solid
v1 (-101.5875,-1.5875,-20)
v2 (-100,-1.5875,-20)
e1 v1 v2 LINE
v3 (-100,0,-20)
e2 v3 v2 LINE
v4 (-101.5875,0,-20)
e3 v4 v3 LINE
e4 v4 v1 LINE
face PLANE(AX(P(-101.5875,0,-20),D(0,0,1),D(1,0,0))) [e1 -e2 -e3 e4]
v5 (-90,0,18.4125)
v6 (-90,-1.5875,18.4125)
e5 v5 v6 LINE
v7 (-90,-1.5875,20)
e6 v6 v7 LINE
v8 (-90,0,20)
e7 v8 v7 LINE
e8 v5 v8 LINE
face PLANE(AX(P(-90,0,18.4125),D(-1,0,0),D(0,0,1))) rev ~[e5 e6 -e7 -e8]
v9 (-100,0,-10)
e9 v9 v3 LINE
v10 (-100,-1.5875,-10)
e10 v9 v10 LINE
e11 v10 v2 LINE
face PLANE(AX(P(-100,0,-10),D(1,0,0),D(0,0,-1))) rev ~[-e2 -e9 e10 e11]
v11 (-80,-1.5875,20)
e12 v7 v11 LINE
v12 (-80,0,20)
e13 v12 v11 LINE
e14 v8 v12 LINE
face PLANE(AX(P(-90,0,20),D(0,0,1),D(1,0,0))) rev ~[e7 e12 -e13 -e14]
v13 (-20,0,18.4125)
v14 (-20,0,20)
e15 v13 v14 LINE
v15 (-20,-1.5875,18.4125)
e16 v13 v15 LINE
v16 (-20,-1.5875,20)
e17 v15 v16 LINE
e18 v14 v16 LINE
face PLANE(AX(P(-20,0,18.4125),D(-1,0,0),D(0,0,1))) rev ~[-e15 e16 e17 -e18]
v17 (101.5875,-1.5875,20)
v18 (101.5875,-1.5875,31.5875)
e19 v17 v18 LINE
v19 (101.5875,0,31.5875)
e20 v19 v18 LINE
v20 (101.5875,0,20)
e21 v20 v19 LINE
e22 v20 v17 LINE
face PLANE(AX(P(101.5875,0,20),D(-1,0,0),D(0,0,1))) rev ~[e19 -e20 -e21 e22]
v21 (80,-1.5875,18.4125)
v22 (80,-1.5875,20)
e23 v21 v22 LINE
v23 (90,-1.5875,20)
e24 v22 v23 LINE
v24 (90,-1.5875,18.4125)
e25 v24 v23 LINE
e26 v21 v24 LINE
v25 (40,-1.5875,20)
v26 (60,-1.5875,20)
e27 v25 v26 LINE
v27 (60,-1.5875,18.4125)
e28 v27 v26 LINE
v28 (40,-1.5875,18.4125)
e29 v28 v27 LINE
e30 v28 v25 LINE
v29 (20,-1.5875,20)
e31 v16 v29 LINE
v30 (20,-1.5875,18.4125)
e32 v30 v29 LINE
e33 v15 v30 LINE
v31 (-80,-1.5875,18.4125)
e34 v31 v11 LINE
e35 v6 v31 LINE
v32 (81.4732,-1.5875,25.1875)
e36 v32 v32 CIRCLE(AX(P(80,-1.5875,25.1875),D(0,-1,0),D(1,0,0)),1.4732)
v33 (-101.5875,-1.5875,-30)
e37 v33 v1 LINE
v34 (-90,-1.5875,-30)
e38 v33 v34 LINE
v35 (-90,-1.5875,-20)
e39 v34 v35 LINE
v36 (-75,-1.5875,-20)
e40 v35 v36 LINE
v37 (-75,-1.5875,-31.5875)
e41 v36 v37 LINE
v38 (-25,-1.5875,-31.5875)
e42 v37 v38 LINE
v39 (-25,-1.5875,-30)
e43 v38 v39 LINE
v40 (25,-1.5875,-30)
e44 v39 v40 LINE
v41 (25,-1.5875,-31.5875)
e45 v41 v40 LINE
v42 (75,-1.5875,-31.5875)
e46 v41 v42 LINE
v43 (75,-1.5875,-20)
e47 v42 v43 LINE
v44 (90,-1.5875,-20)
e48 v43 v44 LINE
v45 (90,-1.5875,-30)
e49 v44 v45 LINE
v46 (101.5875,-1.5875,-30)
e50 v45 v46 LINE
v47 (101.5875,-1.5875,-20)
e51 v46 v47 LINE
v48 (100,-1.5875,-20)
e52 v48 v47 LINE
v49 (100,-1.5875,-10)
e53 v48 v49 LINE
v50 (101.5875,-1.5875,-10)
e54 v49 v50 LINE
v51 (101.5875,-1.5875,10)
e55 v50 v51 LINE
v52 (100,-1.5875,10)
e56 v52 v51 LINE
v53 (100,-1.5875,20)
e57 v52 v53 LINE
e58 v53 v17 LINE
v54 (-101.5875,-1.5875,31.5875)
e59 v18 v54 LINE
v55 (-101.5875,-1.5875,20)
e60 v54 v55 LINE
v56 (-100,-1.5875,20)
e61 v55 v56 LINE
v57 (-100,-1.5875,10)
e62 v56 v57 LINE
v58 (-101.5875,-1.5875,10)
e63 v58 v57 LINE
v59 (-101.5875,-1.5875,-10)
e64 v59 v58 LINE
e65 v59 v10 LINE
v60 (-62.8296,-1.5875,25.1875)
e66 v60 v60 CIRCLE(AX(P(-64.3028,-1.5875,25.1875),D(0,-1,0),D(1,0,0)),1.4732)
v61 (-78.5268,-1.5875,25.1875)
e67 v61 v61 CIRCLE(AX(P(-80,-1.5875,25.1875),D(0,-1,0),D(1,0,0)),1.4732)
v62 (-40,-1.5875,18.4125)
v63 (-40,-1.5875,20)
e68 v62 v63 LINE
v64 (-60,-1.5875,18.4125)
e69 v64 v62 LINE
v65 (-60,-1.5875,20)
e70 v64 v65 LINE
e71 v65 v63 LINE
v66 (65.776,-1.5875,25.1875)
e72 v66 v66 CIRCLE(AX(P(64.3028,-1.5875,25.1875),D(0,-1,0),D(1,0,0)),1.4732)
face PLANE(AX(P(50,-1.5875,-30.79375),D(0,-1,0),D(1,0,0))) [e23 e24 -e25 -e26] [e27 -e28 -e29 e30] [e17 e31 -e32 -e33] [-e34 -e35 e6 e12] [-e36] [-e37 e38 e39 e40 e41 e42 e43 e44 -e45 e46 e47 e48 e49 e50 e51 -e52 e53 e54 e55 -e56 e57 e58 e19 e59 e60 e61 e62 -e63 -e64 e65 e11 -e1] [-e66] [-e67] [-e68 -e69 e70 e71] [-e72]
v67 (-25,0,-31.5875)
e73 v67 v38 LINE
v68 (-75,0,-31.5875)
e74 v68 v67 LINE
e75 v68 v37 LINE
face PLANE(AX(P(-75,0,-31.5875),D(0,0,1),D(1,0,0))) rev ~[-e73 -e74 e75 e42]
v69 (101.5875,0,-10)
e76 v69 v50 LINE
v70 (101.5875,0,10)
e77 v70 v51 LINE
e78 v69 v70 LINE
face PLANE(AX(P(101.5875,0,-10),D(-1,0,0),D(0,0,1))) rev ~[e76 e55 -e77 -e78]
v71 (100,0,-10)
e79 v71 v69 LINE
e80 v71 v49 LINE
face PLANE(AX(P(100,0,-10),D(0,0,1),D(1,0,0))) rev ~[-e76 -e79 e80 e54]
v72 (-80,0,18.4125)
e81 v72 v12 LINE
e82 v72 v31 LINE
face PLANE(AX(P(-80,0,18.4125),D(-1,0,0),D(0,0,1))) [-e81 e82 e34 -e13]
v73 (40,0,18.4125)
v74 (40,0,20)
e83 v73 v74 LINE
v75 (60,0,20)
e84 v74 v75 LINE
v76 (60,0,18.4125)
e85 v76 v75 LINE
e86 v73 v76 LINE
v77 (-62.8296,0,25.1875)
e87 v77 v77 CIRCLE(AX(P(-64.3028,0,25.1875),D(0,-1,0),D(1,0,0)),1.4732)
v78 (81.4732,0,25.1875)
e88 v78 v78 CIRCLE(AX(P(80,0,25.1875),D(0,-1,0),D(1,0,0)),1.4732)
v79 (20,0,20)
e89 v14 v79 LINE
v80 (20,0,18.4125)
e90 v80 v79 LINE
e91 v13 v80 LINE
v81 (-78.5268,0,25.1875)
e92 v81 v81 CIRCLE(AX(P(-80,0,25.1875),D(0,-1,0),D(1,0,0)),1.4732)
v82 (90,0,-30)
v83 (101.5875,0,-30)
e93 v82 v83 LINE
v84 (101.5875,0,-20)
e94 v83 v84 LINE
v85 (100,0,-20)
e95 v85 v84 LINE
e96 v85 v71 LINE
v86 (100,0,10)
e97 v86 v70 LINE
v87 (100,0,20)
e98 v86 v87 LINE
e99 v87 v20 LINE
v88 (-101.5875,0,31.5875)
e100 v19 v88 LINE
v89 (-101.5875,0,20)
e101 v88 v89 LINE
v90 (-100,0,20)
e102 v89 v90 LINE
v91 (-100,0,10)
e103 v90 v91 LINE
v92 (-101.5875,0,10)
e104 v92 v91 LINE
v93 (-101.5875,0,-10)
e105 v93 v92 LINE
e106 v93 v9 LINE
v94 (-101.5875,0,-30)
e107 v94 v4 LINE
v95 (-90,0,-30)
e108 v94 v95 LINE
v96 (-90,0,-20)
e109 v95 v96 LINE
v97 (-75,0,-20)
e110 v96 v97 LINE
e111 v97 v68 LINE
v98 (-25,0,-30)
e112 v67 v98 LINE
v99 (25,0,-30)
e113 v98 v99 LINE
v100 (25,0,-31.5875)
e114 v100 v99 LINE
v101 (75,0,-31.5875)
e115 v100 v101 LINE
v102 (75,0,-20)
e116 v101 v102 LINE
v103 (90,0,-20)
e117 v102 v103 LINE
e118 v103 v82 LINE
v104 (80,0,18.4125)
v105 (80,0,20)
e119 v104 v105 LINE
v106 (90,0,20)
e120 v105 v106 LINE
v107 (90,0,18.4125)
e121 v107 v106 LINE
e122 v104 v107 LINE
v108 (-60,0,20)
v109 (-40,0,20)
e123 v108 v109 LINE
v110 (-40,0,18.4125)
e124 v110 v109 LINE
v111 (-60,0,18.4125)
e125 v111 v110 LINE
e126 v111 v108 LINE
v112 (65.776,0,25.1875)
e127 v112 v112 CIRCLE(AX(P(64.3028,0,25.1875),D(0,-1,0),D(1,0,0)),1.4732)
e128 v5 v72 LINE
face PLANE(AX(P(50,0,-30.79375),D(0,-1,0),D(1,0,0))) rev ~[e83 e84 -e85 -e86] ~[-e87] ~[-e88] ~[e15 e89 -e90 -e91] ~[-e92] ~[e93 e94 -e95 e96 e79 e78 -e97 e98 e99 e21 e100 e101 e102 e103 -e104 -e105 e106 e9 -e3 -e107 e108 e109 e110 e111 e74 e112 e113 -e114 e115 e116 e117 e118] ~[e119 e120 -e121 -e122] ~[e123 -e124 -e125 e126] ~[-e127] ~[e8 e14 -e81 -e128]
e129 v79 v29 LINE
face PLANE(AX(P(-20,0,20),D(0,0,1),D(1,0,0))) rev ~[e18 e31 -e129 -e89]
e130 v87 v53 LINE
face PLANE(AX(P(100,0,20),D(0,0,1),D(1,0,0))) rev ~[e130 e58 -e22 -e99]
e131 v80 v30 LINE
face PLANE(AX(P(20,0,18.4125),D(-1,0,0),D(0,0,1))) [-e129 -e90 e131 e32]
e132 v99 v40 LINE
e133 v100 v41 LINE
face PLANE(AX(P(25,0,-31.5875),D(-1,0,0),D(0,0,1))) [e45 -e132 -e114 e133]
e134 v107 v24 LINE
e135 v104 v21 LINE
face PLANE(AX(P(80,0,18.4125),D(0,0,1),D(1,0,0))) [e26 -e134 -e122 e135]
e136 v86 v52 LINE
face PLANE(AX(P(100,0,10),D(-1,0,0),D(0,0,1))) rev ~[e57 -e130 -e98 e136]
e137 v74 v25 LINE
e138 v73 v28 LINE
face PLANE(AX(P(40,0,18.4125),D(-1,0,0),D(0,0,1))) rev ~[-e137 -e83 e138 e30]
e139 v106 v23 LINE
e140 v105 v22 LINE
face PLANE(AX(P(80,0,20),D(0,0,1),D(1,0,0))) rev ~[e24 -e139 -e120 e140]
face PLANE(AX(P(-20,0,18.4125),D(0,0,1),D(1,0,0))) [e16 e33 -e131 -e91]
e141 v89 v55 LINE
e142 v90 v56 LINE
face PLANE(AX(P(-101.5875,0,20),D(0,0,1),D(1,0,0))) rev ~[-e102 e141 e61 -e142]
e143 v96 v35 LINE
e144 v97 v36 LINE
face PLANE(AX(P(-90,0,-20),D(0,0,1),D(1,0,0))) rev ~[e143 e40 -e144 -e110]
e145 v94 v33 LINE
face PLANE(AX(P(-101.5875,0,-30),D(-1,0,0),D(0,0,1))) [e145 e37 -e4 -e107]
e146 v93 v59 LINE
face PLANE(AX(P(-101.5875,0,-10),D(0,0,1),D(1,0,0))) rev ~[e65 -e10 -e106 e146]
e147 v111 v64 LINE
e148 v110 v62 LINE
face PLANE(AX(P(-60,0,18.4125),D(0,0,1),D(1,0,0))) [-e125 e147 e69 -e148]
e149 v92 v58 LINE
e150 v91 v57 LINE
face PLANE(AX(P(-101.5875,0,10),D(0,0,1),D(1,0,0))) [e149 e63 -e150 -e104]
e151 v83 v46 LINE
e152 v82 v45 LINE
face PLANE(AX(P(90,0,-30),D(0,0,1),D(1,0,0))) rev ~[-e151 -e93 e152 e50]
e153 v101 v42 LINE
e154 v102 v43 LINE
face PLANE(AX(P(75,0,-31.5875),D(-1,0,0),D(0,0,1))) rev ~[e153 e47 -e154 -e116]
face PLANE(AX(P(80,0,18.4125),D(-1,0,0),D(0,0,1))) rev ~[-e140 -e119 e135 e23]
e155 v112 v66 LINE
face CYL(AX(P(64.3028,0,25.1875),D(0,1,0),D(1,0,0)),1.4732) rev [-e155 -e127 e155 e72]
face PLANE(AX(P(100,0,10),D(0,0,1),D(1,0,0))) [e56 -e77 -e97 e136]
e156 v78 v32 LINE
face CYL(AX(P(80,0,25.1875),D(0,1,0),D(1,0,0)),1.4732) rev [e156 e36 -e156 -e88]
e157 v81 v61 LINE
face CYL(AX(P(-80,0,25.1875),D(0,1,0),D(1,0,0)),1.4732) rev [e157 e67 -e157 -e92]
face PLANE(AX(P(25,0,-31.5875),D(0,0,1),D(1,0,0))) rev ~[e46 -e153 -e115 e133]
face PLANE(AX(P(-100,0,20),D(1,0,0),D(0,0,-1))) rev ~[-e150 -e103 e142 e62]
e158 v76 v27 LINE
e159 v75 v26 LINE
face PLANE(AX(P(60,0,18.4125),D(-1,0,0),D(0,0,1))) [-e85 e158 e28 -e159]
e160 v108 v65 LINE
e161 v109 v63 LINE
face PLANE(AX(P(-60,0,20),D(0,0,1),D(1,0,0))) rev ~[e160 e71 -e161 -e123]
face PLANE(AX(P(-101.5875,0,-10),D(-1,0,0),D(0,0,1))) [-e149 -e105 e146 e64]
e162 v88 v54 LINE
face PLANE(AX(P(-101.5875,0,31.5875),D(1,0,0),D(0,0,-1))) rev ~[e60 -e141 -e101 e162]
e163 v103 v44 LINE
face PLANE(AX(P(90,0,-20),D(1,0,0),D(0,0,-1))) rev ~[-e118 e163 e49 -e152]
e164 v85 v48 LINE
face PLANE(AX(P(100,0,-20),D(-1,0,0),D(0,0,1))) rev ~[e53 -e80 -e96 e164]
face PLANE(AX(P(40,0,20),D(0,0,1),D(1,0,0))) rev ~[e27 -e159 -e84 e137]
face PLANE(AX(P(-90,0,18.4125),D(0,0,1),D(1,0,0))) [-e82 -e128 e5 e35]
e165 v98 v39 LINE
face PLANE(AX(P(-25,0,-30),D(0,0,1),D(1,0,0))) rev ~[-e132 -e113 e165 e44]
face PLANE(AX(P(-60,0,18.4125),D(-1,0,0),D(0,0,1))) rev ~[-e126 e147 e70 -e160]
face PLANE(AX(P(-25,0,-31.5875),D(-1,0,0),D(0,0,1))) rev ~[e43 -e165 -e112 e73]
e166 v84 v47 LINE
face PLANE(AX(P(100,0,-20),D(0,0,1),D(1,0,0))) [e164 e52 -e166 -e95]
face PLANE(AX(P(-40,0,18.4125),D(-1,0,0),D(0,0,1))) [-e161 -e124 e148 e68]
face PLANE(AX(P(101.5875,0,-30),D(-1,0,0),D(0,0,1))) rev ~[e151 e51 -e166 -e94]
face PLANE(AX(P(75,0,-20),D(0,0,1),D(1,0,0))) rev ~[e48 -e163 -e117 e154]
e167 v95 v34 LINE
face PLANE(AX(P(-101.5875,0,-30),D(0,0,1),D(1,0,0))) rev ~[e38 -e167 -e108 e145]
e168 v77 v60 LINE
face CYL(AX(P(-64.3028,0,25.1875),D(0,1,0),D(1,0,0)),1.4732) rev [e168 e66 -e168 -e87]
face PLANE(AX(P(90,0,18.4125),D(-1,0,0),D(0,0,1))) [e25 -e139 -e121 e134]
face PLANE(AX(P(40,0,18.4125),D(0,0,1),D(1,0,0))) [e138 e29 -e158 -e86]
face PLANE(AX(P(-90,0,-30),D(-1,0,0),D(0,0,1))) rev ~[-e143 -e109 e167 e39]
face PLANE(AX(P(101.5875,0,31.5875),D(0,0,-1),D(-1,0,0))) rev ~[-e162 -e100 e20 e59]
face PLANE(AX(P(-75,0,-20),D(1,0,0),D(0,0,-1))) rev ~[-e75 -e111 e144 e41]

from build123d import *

# Parameters (mm, degrees)
F0_W     = 50
F0_H     = 1.5875
F0_W_2   = 1.5875
F0_H_2   = 20
F0_H_3   = 10
F0_W_3   = 10
F0_R     = 1.4732
F0_W_4   = 20
F0_W_5   = 40
F1_DEPTH = 1.5875


# Not quite as in the source:
# - a length typed as a fraction of an inch, garbled in the dataset ("3 / 203.2 mm" for 3/8 in), is restored


with BuildPart() as f1:
    # F0 (on Front) → F1 (new body)
    with BuildSketch(Plane.XZ):
        with Locations((50, -30.79375)):
            Rectangle(F0_W, F0_H)
        with Locations((-50, -30.79375)):
            Rectangle(F0_W, F0_H)
        with Locations((100.79375, 0)):
            Rectangle(F0_W_2, F0_H_2)
        with Locations((100.79375, -25)):
            Rectangle(F0_W_2, F0_H_3)
        with Locations((-100.79375, 0)):
            Rectangle(F0_W_2, F0_H_2)
        with Locations((-100.79375, -25)):
            Rectangle(F0_W_2, F0_H_3)
        with Locations((100.79375, 25)):
            Rectangle(F0_W_2, F0_H_3)
        with Locations((-100.79375, 25)):
            Rectangle(F0_W_2, F0_H_3)
        Polygon((-100, 30), (100, 30), (101.5875, 30), (101.5875, 31.5875), (-101.5875, 31.5875), (-101.5875, 30), align=None)
        Polygon((100, 20), (100, 30), (-100, 30), (-100, 20), (-100, 10), (-100, -10), (-100, -20), (-100, -30), (-90, -30), (-90, -20), (-75, -20), (-75, -30), (-25, -30), (25, -30), (75, -30), (75, -20), (90, -20), (90, -30), (100, -30), (100, -20), (100, -10), (100, 10), align=None)
        with Locations((-85, 19.20625)):
            Rectangle(F0_W_3, F0_H, mode=Mode.SUBTRACT)
        with Locations((-80, 25.1875)):
            Circle(F0_R, mode=Mode.SUBTRACT)
        with Locations((-64.3028, 25.1875)):
            Circle(F0_R, mode=Mode.SUBTRACT)
        with Locations((-50, 19.20625)):
            Rectangle(F0_W_4, F0_H, mode=Mode.SUBTRACT)
        with Locations((0, 19.20625)):
            Rectangle(F0_W_5, F0_H, mode=Mode.SUBTRACT)
        with Locations((50, 19.20625)):
            Rectangle(F0_W_4, F0_H, mode=Mode.SUBTRACT)
        with Locations((85, 19.20625)):
            Rectangle(F0_W_3, F0_H, mode=Mode.SUBTRACT)
        with Locations((64.3028, 25.1875)):
            Circle(F0_R, mode=Mode.SUBTRACT)
        with Locations((80, 25.1875)):
            Circle(F0_R, mode=Mode.SUBTRACT)
    extrude(amount=F1_DEPTH)


solid = f1.part
